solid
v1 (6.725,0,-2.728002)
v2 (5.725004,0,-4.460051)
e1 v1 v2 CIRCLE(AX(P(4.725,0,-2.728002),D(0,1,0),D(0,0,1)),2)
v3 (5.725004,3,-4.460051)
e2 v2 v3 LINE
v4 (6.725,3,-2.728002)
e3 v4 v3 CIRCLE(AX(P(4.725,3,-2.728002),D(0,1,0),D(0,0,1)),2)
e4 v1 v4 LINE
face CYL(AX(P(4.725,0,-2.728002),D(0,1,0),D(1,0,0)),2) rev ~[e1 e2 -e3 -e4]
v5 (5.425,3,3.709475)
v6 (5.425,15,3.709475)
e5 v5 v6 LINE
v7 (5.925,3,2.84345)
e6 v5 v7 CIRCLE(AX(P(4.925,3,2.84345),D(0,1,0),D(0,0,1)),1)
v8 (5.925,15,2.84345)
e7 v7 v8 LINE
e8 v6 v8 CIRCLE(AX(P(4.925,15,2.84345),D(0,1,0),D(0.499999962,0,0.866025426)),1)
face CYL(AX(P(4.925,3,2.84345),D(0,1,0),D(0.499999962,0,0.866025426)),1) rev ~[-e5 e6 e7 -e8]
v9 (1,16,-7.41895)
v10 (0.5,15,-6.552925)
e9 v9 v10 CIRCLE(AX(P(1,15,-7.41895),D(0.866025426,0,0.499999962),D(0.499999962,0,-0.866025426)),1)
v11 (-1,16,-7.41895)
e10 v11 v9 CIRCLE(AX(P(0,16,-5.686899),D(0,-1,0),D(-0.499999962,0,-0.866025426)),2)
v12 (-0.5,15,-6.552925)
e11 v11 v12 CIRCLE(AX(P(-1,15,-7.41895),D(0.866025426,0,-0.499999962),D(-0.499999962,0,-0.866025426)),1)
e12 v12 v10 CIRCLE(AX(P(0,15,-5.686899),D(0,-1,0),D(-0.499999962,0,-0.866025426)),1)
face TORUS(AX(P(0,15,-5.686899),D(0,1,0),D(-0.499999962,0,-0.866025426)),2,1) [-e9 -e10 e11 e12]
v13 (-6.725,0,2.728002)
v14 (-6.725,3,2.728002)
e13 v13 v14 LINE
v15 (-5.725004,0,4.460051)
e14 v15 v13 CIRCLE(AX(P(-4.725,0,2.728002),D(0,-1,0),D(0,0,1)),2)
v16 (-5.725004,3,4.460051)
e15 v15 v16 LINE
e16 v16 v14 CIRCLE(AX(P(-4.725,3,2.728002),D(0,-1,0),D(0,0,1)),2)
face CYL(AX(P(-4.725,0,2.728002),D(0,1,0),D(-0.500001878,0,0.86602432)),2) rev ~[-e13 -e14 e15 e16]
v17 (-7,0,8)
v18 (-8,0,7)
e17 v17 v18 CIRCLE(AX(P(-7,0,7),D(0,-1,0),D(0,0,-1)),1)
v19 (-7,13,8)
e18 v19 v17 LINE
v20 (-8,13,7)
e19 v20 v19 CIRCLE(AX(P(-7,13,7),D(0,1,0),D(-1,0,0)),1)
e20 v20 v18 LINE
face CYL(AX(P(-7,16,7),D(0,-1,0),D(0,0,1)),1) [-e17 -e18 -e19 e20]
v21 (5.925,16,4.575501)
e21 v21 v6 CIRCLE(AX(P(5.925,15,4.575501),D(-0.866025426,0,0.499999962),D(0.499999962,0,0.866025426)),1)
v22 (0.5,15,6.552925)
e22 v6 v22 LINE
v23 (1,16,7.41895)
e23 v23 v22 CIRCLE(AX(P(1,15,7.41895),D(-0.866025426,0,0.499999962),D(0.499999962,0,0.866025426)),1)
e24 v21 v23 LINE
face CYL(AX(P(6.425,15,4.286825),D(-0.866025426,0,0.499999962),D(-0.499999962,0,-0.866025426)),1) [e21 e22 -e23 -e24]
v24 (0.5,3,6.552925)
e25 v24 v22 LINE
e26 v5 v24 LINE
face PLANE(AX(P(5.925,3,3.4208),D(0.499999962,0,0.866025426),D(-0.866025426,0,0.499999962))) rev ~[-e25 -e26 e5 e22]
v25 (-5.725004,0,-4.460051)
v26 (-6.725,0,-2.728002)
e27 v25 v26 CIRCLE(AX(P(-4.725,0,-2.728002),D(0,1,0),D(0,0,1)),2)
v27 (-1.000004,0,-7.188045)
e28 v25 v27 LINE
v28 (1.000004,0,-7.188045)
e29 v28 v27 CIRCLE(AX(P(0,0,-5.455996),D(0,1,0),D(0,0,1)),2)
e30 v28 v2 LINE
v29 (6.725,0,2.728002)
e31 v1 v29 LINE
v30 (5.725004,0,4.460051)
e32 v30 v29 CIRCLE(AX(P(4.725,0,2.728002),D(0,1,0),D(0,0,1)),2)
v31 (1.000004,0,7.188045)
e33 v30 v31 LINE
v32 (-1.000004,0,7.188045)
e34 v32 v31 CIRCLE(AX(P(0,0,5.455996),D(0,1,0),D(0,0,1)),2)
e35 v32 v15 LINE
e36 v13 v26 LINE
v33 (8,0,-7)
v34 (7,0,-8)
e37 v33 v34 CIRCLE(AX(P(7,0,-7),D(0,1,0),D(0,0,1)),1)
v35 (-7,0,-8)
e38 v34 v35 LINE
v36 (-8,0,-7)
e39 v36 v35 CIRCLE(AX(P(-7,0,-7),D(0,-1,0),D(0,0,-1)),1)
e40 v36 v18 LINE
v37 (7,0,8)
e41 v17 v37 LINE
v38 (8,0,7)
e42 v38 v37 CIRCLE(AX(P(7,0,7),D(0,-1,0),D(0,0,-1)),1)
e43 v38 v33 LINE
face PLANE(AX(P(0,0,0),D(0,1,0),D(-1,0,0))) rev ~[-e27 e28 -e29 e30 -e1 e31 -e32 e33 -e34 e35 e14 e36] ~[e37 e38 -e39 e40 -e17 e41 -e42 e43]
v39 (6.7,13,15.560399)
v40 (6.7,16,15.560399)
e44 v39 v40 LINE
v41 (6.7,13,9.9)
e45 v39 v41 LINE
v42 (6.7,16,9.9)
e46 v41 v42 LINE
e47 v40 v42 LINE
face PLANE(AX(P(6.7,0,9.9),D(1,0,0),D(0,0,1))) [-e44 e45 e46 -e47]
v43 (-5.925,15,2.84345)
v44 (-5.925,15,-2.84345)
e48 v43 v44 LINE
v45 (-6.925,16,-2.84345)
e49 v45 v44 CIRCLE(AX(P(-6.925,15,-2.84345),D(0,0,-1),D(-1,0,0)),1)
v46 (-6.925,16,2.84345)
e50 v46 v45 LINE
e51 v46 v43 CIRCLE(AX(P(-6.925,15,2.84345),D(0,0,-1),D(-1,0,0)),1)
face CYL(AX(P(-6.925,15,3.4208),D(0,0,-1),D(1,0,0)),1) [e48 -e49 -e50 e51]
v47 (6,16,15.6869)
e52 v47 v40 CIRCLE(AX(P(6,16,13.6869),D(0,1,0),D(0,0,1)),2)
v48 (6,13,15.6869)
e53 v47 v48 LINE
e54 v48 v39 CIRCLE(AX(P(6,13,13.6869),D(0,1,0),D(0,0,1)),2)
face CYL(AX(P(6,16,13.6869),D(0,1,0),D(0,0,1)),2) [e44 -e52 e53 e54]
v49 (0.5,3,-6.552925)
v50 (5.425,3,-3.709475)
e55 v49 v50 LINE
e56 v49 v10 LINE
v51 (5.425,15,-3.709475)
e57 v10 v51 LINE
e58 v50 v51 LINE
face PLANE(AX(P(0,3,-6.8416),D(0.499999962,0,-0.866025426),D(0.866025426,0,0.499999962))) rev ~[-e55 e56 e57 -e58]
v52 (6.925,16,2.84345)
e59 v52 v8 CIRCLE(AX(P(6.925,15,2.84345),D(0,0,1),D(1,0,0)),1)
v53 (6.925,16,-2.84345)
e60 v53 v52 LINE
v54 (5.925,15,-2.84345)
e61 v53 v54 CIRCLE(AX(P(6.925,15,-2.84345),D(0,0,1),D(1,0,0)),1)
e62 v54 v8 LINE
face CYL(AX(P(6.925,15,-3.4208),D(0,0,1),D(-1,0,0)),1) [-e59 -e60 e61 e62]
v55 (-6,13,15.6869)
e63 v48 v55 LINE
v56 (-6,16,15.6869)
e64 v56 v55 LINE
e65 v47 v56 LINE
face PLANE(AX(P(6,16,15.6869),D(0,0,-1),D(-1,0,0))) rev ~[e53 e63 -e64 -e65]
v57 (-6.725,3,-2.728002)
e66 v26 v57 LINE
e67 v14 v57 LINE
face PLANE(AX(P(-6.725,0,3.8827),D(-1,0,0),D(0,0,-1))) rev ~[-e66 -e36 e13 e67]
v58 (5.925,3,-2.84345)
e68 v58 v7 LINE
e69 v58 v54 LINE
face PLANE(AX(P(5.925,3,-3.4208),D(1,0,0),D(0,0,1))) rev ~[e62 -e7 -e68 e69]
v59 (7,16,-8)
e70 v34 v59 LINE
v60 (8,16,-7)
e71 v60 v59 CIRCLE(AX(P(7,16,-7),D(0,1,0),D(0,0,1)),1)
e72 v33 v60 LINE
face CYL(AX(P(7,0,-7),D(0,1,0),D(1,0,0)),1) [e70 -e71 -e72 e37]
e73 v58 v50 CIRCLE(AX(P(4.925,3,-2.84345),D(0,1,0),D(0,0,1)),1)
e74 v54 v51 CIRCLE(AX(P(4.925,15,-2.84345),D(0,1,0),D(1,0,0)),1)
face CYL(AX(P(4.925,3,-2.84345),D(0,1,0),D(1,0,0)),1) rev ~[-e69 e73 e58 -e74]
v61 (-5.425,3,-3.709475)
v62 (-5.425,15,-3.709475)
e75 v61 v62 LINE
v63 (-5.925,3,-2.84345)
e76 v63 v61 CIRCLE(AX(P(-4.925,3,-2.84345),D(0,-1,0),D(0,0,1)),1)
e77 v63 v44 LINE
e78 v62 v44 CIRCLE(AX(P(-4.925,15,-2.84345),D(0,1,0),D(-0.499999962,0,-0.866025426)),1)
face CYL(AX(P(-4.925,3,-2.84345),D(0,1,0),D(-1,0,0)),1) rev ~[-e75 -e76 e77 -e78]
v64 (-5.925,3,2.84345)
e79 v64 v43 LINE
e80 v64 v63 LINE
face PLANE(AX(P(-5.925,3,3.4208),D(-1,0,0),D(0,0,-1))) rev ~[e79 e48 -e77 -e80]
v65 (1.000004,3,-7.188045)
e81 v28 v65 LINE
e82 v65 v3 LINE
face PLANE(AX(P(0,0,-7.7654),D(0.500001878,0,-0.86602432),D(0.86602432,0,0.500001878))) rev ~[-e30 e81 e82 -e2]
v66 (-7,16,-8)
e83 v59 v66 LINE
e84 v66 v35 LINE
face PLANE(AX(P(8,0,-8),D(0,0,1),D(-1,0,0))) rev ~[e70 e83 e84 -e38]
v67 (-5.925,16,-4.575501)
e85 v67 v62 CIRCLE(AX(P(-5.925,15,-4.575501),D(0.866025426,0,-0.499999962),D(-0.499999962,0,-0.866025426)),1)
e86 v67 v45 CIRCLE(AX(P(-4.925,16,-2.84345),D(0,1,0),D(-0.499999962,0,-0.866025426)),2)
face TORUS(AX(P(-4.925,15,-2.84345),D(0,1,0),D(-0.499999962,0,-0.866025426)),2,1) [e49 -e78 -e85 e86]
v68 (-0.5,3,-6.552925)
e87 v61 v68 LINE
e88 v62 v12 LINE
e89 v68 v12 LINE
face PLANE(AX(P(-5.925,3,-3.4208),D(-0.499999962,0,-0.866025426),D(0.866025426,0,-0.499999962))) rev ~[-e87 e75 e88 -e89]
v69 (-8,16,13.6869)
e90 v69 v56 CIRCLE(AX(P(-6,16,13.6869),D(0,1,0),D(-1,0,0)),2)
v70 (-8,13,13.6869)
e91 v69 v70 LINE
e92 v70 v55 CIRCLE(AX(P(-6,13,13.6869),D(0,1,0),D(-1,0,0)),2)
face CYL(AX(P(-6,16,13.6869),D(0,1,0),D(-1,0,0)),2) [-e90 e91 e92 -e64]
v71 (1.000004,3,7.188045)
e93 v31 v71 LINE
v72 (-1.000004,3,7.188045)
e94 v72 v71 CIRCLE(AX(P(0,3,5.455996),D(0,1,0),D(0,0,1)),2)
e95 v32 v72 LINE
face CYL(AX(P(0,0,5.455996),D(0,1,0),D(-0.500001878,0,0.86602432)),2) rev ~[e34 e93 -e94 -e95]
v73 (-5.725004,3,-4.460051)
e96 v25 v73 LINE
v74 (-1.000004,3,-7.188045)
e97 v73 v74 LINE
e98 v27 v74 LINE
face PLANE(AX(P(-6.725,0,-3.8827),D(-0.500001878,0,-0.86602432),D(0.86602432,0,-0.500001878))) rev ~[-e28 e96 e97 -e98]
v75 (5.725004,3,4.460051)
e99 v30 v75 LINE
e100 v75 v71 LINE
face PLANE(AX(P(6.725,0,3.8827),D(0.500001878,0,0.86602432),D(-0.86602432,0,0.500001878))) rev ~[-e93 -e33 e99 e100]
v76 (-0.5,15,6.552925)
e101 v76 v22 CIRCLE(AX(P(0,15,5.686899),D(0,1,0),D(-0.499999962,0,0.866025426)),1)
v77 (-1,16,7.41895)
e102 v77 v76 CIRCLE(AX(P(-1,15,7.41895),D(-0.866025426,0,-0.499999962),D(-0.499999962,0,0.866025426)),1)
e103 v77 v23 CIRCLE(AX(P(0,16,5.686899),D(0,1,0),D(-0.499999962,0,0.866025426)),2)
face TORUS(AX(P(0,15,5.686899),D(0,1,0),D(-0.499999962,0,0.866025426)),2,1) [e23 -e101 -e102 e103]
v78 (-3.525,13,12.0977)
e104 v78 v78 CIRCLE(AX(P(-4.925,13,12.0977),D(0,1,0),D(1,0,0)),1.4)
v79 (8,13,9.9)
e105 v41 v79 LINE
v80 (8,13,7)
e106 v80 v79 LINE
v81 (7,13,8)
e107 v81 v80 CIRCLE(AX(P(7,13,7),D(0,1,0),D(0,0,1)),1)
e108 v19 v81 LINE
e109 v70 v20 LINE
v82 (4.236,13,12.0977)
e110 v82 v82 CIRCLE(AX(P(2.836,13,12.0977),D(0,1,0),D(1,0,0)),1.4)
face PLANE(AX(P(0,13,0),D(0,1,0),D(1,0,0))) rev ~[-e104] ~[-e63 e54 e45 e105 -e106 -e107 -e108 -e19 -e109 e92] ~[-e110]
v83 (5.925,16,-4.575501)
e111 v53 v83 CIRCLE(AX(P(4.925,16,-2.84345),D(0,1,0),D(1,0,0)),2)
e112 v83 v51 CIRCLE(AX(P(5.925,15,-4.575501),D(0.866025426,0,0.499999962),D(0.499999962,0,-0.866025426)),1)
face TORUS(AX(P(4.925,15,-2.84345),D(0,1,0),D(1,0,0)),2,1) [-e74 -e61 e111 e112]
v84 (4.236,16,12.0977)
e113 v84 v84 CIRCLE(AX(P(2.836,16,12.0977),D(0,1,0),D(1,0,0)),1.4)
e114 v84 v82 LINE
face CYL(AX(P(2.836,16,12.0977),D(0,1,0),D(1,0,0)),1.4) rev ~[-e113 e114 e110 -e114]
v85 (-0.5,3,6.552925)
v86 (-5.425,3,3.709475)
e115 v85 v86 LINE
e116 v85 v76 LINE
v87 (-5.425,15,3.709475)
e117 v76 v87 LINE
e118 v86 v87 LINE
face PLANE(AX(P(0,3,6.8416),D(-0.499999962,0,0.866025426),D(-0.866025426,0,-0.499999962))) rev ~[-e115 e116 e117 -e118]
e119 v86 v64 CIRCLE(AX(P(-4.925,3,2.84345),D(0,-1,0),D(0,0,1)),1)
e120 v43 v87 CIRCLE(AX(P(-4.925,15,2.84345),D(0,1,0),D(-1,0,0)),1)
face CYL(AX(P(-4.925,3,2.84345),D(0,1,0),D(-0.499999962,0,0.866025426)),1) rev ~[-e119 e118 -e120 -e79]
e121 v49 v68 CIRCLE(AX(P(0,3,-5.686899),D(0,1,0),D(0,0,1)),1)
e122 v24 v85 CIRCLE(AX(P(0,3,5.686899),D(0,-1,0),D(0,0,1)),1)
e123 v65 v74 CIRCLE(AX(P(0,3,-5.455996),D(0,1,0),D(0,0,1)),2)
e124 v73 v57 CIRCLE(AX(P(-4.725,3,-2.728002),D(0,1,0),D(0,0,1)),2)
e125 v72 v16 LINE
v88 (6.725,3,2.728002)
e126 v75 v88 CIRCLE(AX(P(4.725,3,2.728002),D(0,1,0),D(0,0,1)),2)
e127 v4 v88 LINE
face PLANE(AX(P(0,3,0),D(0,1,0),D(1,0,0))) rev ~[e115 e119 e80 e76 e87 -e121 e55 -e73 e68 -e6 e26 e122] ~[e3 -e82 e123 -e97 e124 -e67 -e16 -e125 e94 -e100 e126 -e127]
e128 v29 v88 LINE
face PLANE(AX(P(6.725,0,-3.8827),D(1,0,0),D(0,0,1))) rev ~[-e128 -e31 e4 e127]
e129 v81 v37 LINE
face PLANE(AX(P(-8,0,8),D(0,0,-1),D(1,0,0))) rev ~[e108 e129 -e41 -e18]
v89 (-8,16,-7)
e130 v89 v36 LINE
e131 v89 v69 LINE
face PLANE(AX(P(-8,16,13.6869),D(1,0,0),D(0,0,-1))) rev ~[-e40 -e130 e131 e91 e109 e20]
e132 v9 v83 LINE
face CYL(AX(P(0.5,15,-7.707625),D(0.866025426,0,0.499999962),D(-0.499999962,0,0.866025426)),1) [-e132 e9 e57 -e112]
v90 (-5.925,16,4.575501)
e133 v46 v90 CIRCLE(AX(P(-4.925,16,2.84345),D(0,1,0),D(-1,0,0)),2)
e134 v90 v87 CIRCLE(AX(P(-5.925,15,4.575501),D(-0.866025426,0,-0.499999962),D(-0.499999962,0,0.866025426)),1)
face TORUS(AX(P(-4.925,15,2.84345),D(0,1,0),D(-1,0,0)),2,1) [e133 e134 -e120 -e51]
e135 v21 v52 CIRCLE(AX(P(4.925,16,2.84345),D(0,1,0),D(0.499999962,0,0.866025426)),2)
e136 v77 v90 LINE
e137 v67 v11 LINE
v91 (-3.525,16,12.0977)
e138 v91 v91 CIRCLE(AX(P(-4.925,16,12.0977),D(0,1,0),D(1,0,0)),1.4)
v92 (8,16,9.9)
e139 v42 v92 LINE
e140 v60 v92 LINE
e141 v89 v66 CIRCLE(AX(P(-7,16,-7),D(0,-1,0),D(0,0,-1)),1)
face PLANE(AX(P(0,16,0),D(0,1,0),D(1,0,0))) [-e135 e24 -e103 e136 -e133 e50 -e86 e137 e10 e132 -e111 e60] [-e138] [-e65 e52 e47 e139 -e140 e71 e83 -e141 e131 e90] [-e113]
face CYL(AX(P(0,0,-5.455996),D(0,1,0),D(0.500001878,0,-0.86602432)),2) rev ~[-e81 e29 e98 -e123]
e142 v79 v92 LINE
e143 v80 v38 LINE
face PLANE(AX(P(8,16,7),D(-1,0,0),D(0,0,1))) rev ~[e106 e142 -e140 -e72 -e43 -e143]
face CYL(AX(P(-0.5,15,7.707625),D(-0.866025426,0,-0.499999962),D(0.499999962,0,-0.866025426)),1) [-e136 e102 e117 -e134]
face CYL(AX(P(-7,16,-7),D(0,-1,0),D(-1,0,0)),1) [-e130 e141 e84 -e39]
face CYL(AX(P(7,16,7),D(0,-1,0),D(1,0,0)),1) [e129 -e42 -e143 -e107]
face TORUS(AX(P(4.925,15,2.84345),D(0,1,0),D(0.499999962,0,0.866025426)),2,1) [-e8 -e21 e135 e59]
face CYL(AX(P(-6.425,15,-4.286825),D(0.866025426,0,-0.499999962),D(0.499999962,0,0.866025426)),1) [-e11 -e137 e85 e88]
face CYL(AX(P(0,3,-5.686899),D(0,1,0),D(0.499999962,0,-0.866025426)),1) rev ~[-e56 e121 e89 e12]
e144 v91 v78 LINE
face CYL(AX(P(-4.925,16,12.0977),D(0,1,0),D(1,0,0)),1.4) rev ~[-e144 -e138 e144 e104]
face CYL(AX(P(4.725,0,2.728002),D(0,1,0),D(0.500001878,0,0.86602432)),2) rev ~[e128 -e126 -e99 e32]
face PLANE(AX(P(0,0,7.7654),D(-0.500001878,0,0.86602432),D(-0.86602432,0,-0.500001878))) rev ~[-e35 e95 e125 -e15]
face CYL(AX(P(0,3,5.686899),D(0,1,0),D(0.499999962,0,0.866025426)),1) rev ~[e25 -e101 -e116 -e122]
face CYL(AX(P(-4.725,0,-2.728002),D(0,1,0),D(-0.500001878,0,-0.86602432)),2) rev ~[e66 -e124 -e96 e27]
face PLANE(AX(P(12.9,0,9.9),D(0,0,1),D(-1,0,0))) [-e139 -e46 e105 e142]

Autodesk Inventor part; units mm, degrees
ref_plane "YZ Plane" through (0, 0, 0) normal (1, 0, 0) x (0, 1, 0)
ref_plane "XZ Plane" through (0, 0, 0) normal (0, 1, 0) x (-1, 0, 0)
ref_plane "XY Plane" through (0, 0, 0) normal (0, 0, 1) x (1, 0, 0)
sketch "Skizze1" plane through (0, 0, 0) normal (0, 1, 0) x (-1, 0, 0)
  line L0 (6.725, 3.8827) -> (6.725, -3.8827)
  line L1 (6.725, -3.8827) -> (0, -7.7654)
  line L2 (0, -7.7654) -> (-6.725, -3.8827)
  line L3 (-6.725, -3.8827) -> (-6.725, 3.8827)
  line L4 (-6.725, 3.8827) -> (0, 7.7654)
  line L5 (0, 7.7654) -> (6.725, 3.8827)
  line L6 (-8, -8) -> (8, -8)
  line L7 (8, -8) -> (8, 8)
  line L8 (8, 8) -> (-8, 8)
  line L9 (-8, 8) -> (-8, -8)
  line L10 (-8, -8) -> (8, 8) construction
  line L11 (8, -8) -> (-8, 8) construction
  point P0 (0, 0)
  point P1 (0, 0)
  point P2 (-0.3096, 7.5)
  point P3 (-0.3096, -7.5)
  point P4 (0.3096, -7.5)
  point P5 (0.3096, 7.5)
  dimension "d0" = 16
  dimension "d1" = 16
  dimension "d2" = 13.45
extrude "Extrusion1" add sketch "Skizze1" along normal blind 3
fillet "Rundung1" radius 2 6 edges at (-6.725, 1.5, -3.8827) (-6.725, 1.5, 3.8827) (0, 1.5, 7.7654) (6.725, 1.5, 3.8827) (6.725, 1.5, -3.8827) (0, 1.5, -7.7654)
sketch "Skizze2" plane through (0, 3, 0) normal (0, 1, 0) x (1, 0, 0)
  line L0 (-8, 8) -> (-8, -8) projected
  line L1 (-8, -8) -> (8, -8) projected
  line L2 (8, -8) -> (8, 8) projected
  line L3 (8, 8) -> (-8, 8) projected
  line L4 (-5.725, 4.46) -> (-1, 7.188) projected
  arc A0 (1, 7.188) -> (-1, 7.188) centre (0, 5.456) ccw projected
  line L5 (1, 7.188) -> (5.725, 4.46) projected
  arc A1 (6.725, 2.728) -> (5.725, 4.46) centre (4.725, 2.728) ccw projected
  line L6 (6.725, 2.728) -> (6.725, -2.728) projected
  arc A2 (5.725, -4.46) -> (6.725, -2.728) centre (4.725, -2.728) ccw projected
  line L7 (5.725, -4.46) -> (1, -7.188) projected
  arc A3 (-1, -7.188) -> (1, -7.188) centre (0, -5.456) ccw projected
  line L8 (-1, -7.188) -> (-5.725, -4.46) projected
  arc A4 (-6.725, -2.728) -> (-5.725, -4.46) centre (-4.725, -2.728) ccw projected
  line L9 (-6.725, -2.728) -> (-6.725, 2.728) projected
  arc A5 (-5.725, 4.46) -> (-6.725, 2.728) centre (-4.725, 2.728) ccw projected
  line L10 (0, -6.8416) -> (-5.925, -3.4208)
  line L11 (-5.925, -3.4208) -> (-5.925, 3.4208)
  line L12 (-5.925, 3.4208) -> (0, 6.8416)
  line L13 (0, 6.8416) -> (5.925, 3.4208)
  line L14 (5.925, 3.4208) -> (5.925, -3.4208)
  line L15 (5.925, -3.4208) -> (0, -6.8416)
  point P0 (0, 0)
  point P1 (0, 0)
  point P2 (8, 5.7735)
  point P3 (8, -5.7735)
  point P4 (-8, -5.7735)
  point P5 (-8, 5.7735)
  point P6 (4.1436, -8)
  point P7 (-4.1436, -8)
  point P8 (4.1436, 8)
  point P9 (-4.1436, 8)
  dimension "d6" = 11.85
extrude "Extrusion2" add sketch "Skizze2" along normal blind 13 contours L3 L2 L1 L0 | L4 A0 L5 A1 L6 A2 L7 A3 L8 A4 L9 A5
fillet "Rundung2" radius 1 16 edges at (0, 9.5, 6.8416) (-5.925, 9.5, 3.4208) (-5.925, 9.5, -3.4208) (0, 9.5, -6.8416) (5.925, 9.5, -3.4208) (5.925, 9.5, 3.4208) (8, 8, -8) (-8, 8, -8) (-8, 8, 8) (8, 8, 8) (-2.9625, 16, -5.1312) (-5.925, 16, 0) (-2.9625, 16, 5.1312) (2.9625, 16, 5.1312) (5.925, 16, 0) (2.9625, 16, -5.1312)
ref_plane "Arbeitsebene1" through (0, 0, -8) normal (-1, 0, 0) x (0, 0, 1)
ref_plane "Arbeitsebene2" through (-8, 0, 0) normal (0, 0, 1) x (1, 0, 0)
sketch "Skizze3" plane through (0, 16, 0) normal (0, 1, 0) x (1, 0, 0)
  arc A0 (7, -8) -> (8, -7) centre (7, -7) ccw projected
  line L0 (8, -7) -> (8, 7) projected
  arc A1 (8, 7) -> (7, 8) centre (7, 7) ccw projected
  line L1 (7, 8) -> (-7, 8) projected
  arc A2 (-7, 8) -> (-8, 7) centre (-7, 7) ccw projected
  line L2 (-8, 7) -> (-8, -7) projected
  arc A3 (-8, -7) -> (-7, -8) centre (-7, -7) ccw projected
  line L3 (-7, -8) -> (7, -8) projected
  arc A4 (-1, -7.419) -> (1, -7.419) centre (0, -5.6869) ccw projected
  line L4 (-5.925, -4.5755) -> (-1, -7.419) projected
  arc A5 (-6.925, -2.8435) -> (-5.925, -4.5755) centre (-4.925, -2.8435) ccw projected
  line L5 (-6.925, 2.8435) -> (-6.925, -2.8435) projected
  arc A6 (-5.925, 4.5755) -> (-6.925, 2.8435) centre (-4.925, 2.8435) ccw projected
  line L6 (-1, 7.419) -> (-5.925, 4.5755) projected
  arc A7 (1, 7.419) -> (-1, 7.419) centre (0, 5.6869) ccw projected
  line L7 (5.925, 4.5755) -> (1, 7.419) projected
  arc A8 (6.925, 2.8435) -> (5.925, 4.5755) centre (4.925, 2.8435) ccw projected
  line L8 (6.925, -2.8435) -> (6.925, 2.8435) projected
  arc A9 (5.925, -4.5755) -> (6.925, -2.8435) centre (4.925, -2.8435) ccw projected
  line L9 (1, -7.419) -> (5.925, -4.5755) projected
  line L10 (-8, -5.6869) -> (8, -5.6869)
  line L11 (8, -5.6869) -> (8, -13.6869)
  line L12 (6, -15.6869) -> (-6, -15.6869)
  line L13 (-8, -13.6869) -> (-8, -5.6869)
  circle A10 centre (-4.925, -12.0977) radius 1.4
  circle A11 centre (2.836, -12.0977) radius 1.4
  arc A12 (-8, -13.6869) -> (-6, -15.6869) centre (-6, -13.6869) ccw
  arc A13 (6, -15.6869) -> (8, -13.6869) centre (6, -13.6869) ccw
  point P0 (0, 0)
  point P1 (8, -15.6869)
  point P2 (8, -7)
  dimension "d10" = 10
  dimension "d11" = 2.8
  dimension "d12" = 2.8
  dimension "d13" = 2
extrude "Extrusion3" add sketch "Skizze3" against normal blind 3 contours A0 L11 A13 L12 A12 L13 A3 L3
sketch "Skizze4" plane through (0, 0, 0) normal (0, -1, 0) x (1, 0, 0)
  line L0 (12.8, 30) -> (12.8, 10) projected
  line L1 (12.8, 30) -> (6.8, 30) projected
  line L2 (6.8, 10) -> (6.8, 30) projected
  line L3 (12.8, 10) -> (6.8, 10) projected
  line L4 (6.7, 30.1) -> (12.9, 30.1)
  line L5 (12.9, 30.1) -> (12.9, 9.9)
  line L6 (12.9, 9.9) -> (6.7, 9.9)
  line L7 (6.7, 9.9) -> (6.7, 30.1)
  point P0 (0, 0)
  dimension "d16" = 0.1
extrude "Extrusion4" cut sketch "Skizze4" against normal through all contours L0 L3 L2 L1 | L4 L5 L6 L7
sketch "Skizze5" plane through (0, 0, 0) normal (0, -1, 0) x (1, 0, 0)
  line L0 (-4.75, -4.75) -> (4.75, -4.75)
  line L1 (4.75, -4.75) -> (4.75, 4.75)
  line L2 (4.75, 4.75) -> (-4.75, 4.75)
  line L3 (-4.75, 4.75) -> (-4.75, -4.75)
  line L4 (-4.75, -4.75) -> (4.75, 4.75) construction
  line L5 (4.75, -4.75) -> (-4.75, 4.75) construction
  point P0 (0, 0)
  dimension "d19" = 9.5
  dimension "d20" = 9.5
properties part number "30_Laser_to_M12Adapter"
